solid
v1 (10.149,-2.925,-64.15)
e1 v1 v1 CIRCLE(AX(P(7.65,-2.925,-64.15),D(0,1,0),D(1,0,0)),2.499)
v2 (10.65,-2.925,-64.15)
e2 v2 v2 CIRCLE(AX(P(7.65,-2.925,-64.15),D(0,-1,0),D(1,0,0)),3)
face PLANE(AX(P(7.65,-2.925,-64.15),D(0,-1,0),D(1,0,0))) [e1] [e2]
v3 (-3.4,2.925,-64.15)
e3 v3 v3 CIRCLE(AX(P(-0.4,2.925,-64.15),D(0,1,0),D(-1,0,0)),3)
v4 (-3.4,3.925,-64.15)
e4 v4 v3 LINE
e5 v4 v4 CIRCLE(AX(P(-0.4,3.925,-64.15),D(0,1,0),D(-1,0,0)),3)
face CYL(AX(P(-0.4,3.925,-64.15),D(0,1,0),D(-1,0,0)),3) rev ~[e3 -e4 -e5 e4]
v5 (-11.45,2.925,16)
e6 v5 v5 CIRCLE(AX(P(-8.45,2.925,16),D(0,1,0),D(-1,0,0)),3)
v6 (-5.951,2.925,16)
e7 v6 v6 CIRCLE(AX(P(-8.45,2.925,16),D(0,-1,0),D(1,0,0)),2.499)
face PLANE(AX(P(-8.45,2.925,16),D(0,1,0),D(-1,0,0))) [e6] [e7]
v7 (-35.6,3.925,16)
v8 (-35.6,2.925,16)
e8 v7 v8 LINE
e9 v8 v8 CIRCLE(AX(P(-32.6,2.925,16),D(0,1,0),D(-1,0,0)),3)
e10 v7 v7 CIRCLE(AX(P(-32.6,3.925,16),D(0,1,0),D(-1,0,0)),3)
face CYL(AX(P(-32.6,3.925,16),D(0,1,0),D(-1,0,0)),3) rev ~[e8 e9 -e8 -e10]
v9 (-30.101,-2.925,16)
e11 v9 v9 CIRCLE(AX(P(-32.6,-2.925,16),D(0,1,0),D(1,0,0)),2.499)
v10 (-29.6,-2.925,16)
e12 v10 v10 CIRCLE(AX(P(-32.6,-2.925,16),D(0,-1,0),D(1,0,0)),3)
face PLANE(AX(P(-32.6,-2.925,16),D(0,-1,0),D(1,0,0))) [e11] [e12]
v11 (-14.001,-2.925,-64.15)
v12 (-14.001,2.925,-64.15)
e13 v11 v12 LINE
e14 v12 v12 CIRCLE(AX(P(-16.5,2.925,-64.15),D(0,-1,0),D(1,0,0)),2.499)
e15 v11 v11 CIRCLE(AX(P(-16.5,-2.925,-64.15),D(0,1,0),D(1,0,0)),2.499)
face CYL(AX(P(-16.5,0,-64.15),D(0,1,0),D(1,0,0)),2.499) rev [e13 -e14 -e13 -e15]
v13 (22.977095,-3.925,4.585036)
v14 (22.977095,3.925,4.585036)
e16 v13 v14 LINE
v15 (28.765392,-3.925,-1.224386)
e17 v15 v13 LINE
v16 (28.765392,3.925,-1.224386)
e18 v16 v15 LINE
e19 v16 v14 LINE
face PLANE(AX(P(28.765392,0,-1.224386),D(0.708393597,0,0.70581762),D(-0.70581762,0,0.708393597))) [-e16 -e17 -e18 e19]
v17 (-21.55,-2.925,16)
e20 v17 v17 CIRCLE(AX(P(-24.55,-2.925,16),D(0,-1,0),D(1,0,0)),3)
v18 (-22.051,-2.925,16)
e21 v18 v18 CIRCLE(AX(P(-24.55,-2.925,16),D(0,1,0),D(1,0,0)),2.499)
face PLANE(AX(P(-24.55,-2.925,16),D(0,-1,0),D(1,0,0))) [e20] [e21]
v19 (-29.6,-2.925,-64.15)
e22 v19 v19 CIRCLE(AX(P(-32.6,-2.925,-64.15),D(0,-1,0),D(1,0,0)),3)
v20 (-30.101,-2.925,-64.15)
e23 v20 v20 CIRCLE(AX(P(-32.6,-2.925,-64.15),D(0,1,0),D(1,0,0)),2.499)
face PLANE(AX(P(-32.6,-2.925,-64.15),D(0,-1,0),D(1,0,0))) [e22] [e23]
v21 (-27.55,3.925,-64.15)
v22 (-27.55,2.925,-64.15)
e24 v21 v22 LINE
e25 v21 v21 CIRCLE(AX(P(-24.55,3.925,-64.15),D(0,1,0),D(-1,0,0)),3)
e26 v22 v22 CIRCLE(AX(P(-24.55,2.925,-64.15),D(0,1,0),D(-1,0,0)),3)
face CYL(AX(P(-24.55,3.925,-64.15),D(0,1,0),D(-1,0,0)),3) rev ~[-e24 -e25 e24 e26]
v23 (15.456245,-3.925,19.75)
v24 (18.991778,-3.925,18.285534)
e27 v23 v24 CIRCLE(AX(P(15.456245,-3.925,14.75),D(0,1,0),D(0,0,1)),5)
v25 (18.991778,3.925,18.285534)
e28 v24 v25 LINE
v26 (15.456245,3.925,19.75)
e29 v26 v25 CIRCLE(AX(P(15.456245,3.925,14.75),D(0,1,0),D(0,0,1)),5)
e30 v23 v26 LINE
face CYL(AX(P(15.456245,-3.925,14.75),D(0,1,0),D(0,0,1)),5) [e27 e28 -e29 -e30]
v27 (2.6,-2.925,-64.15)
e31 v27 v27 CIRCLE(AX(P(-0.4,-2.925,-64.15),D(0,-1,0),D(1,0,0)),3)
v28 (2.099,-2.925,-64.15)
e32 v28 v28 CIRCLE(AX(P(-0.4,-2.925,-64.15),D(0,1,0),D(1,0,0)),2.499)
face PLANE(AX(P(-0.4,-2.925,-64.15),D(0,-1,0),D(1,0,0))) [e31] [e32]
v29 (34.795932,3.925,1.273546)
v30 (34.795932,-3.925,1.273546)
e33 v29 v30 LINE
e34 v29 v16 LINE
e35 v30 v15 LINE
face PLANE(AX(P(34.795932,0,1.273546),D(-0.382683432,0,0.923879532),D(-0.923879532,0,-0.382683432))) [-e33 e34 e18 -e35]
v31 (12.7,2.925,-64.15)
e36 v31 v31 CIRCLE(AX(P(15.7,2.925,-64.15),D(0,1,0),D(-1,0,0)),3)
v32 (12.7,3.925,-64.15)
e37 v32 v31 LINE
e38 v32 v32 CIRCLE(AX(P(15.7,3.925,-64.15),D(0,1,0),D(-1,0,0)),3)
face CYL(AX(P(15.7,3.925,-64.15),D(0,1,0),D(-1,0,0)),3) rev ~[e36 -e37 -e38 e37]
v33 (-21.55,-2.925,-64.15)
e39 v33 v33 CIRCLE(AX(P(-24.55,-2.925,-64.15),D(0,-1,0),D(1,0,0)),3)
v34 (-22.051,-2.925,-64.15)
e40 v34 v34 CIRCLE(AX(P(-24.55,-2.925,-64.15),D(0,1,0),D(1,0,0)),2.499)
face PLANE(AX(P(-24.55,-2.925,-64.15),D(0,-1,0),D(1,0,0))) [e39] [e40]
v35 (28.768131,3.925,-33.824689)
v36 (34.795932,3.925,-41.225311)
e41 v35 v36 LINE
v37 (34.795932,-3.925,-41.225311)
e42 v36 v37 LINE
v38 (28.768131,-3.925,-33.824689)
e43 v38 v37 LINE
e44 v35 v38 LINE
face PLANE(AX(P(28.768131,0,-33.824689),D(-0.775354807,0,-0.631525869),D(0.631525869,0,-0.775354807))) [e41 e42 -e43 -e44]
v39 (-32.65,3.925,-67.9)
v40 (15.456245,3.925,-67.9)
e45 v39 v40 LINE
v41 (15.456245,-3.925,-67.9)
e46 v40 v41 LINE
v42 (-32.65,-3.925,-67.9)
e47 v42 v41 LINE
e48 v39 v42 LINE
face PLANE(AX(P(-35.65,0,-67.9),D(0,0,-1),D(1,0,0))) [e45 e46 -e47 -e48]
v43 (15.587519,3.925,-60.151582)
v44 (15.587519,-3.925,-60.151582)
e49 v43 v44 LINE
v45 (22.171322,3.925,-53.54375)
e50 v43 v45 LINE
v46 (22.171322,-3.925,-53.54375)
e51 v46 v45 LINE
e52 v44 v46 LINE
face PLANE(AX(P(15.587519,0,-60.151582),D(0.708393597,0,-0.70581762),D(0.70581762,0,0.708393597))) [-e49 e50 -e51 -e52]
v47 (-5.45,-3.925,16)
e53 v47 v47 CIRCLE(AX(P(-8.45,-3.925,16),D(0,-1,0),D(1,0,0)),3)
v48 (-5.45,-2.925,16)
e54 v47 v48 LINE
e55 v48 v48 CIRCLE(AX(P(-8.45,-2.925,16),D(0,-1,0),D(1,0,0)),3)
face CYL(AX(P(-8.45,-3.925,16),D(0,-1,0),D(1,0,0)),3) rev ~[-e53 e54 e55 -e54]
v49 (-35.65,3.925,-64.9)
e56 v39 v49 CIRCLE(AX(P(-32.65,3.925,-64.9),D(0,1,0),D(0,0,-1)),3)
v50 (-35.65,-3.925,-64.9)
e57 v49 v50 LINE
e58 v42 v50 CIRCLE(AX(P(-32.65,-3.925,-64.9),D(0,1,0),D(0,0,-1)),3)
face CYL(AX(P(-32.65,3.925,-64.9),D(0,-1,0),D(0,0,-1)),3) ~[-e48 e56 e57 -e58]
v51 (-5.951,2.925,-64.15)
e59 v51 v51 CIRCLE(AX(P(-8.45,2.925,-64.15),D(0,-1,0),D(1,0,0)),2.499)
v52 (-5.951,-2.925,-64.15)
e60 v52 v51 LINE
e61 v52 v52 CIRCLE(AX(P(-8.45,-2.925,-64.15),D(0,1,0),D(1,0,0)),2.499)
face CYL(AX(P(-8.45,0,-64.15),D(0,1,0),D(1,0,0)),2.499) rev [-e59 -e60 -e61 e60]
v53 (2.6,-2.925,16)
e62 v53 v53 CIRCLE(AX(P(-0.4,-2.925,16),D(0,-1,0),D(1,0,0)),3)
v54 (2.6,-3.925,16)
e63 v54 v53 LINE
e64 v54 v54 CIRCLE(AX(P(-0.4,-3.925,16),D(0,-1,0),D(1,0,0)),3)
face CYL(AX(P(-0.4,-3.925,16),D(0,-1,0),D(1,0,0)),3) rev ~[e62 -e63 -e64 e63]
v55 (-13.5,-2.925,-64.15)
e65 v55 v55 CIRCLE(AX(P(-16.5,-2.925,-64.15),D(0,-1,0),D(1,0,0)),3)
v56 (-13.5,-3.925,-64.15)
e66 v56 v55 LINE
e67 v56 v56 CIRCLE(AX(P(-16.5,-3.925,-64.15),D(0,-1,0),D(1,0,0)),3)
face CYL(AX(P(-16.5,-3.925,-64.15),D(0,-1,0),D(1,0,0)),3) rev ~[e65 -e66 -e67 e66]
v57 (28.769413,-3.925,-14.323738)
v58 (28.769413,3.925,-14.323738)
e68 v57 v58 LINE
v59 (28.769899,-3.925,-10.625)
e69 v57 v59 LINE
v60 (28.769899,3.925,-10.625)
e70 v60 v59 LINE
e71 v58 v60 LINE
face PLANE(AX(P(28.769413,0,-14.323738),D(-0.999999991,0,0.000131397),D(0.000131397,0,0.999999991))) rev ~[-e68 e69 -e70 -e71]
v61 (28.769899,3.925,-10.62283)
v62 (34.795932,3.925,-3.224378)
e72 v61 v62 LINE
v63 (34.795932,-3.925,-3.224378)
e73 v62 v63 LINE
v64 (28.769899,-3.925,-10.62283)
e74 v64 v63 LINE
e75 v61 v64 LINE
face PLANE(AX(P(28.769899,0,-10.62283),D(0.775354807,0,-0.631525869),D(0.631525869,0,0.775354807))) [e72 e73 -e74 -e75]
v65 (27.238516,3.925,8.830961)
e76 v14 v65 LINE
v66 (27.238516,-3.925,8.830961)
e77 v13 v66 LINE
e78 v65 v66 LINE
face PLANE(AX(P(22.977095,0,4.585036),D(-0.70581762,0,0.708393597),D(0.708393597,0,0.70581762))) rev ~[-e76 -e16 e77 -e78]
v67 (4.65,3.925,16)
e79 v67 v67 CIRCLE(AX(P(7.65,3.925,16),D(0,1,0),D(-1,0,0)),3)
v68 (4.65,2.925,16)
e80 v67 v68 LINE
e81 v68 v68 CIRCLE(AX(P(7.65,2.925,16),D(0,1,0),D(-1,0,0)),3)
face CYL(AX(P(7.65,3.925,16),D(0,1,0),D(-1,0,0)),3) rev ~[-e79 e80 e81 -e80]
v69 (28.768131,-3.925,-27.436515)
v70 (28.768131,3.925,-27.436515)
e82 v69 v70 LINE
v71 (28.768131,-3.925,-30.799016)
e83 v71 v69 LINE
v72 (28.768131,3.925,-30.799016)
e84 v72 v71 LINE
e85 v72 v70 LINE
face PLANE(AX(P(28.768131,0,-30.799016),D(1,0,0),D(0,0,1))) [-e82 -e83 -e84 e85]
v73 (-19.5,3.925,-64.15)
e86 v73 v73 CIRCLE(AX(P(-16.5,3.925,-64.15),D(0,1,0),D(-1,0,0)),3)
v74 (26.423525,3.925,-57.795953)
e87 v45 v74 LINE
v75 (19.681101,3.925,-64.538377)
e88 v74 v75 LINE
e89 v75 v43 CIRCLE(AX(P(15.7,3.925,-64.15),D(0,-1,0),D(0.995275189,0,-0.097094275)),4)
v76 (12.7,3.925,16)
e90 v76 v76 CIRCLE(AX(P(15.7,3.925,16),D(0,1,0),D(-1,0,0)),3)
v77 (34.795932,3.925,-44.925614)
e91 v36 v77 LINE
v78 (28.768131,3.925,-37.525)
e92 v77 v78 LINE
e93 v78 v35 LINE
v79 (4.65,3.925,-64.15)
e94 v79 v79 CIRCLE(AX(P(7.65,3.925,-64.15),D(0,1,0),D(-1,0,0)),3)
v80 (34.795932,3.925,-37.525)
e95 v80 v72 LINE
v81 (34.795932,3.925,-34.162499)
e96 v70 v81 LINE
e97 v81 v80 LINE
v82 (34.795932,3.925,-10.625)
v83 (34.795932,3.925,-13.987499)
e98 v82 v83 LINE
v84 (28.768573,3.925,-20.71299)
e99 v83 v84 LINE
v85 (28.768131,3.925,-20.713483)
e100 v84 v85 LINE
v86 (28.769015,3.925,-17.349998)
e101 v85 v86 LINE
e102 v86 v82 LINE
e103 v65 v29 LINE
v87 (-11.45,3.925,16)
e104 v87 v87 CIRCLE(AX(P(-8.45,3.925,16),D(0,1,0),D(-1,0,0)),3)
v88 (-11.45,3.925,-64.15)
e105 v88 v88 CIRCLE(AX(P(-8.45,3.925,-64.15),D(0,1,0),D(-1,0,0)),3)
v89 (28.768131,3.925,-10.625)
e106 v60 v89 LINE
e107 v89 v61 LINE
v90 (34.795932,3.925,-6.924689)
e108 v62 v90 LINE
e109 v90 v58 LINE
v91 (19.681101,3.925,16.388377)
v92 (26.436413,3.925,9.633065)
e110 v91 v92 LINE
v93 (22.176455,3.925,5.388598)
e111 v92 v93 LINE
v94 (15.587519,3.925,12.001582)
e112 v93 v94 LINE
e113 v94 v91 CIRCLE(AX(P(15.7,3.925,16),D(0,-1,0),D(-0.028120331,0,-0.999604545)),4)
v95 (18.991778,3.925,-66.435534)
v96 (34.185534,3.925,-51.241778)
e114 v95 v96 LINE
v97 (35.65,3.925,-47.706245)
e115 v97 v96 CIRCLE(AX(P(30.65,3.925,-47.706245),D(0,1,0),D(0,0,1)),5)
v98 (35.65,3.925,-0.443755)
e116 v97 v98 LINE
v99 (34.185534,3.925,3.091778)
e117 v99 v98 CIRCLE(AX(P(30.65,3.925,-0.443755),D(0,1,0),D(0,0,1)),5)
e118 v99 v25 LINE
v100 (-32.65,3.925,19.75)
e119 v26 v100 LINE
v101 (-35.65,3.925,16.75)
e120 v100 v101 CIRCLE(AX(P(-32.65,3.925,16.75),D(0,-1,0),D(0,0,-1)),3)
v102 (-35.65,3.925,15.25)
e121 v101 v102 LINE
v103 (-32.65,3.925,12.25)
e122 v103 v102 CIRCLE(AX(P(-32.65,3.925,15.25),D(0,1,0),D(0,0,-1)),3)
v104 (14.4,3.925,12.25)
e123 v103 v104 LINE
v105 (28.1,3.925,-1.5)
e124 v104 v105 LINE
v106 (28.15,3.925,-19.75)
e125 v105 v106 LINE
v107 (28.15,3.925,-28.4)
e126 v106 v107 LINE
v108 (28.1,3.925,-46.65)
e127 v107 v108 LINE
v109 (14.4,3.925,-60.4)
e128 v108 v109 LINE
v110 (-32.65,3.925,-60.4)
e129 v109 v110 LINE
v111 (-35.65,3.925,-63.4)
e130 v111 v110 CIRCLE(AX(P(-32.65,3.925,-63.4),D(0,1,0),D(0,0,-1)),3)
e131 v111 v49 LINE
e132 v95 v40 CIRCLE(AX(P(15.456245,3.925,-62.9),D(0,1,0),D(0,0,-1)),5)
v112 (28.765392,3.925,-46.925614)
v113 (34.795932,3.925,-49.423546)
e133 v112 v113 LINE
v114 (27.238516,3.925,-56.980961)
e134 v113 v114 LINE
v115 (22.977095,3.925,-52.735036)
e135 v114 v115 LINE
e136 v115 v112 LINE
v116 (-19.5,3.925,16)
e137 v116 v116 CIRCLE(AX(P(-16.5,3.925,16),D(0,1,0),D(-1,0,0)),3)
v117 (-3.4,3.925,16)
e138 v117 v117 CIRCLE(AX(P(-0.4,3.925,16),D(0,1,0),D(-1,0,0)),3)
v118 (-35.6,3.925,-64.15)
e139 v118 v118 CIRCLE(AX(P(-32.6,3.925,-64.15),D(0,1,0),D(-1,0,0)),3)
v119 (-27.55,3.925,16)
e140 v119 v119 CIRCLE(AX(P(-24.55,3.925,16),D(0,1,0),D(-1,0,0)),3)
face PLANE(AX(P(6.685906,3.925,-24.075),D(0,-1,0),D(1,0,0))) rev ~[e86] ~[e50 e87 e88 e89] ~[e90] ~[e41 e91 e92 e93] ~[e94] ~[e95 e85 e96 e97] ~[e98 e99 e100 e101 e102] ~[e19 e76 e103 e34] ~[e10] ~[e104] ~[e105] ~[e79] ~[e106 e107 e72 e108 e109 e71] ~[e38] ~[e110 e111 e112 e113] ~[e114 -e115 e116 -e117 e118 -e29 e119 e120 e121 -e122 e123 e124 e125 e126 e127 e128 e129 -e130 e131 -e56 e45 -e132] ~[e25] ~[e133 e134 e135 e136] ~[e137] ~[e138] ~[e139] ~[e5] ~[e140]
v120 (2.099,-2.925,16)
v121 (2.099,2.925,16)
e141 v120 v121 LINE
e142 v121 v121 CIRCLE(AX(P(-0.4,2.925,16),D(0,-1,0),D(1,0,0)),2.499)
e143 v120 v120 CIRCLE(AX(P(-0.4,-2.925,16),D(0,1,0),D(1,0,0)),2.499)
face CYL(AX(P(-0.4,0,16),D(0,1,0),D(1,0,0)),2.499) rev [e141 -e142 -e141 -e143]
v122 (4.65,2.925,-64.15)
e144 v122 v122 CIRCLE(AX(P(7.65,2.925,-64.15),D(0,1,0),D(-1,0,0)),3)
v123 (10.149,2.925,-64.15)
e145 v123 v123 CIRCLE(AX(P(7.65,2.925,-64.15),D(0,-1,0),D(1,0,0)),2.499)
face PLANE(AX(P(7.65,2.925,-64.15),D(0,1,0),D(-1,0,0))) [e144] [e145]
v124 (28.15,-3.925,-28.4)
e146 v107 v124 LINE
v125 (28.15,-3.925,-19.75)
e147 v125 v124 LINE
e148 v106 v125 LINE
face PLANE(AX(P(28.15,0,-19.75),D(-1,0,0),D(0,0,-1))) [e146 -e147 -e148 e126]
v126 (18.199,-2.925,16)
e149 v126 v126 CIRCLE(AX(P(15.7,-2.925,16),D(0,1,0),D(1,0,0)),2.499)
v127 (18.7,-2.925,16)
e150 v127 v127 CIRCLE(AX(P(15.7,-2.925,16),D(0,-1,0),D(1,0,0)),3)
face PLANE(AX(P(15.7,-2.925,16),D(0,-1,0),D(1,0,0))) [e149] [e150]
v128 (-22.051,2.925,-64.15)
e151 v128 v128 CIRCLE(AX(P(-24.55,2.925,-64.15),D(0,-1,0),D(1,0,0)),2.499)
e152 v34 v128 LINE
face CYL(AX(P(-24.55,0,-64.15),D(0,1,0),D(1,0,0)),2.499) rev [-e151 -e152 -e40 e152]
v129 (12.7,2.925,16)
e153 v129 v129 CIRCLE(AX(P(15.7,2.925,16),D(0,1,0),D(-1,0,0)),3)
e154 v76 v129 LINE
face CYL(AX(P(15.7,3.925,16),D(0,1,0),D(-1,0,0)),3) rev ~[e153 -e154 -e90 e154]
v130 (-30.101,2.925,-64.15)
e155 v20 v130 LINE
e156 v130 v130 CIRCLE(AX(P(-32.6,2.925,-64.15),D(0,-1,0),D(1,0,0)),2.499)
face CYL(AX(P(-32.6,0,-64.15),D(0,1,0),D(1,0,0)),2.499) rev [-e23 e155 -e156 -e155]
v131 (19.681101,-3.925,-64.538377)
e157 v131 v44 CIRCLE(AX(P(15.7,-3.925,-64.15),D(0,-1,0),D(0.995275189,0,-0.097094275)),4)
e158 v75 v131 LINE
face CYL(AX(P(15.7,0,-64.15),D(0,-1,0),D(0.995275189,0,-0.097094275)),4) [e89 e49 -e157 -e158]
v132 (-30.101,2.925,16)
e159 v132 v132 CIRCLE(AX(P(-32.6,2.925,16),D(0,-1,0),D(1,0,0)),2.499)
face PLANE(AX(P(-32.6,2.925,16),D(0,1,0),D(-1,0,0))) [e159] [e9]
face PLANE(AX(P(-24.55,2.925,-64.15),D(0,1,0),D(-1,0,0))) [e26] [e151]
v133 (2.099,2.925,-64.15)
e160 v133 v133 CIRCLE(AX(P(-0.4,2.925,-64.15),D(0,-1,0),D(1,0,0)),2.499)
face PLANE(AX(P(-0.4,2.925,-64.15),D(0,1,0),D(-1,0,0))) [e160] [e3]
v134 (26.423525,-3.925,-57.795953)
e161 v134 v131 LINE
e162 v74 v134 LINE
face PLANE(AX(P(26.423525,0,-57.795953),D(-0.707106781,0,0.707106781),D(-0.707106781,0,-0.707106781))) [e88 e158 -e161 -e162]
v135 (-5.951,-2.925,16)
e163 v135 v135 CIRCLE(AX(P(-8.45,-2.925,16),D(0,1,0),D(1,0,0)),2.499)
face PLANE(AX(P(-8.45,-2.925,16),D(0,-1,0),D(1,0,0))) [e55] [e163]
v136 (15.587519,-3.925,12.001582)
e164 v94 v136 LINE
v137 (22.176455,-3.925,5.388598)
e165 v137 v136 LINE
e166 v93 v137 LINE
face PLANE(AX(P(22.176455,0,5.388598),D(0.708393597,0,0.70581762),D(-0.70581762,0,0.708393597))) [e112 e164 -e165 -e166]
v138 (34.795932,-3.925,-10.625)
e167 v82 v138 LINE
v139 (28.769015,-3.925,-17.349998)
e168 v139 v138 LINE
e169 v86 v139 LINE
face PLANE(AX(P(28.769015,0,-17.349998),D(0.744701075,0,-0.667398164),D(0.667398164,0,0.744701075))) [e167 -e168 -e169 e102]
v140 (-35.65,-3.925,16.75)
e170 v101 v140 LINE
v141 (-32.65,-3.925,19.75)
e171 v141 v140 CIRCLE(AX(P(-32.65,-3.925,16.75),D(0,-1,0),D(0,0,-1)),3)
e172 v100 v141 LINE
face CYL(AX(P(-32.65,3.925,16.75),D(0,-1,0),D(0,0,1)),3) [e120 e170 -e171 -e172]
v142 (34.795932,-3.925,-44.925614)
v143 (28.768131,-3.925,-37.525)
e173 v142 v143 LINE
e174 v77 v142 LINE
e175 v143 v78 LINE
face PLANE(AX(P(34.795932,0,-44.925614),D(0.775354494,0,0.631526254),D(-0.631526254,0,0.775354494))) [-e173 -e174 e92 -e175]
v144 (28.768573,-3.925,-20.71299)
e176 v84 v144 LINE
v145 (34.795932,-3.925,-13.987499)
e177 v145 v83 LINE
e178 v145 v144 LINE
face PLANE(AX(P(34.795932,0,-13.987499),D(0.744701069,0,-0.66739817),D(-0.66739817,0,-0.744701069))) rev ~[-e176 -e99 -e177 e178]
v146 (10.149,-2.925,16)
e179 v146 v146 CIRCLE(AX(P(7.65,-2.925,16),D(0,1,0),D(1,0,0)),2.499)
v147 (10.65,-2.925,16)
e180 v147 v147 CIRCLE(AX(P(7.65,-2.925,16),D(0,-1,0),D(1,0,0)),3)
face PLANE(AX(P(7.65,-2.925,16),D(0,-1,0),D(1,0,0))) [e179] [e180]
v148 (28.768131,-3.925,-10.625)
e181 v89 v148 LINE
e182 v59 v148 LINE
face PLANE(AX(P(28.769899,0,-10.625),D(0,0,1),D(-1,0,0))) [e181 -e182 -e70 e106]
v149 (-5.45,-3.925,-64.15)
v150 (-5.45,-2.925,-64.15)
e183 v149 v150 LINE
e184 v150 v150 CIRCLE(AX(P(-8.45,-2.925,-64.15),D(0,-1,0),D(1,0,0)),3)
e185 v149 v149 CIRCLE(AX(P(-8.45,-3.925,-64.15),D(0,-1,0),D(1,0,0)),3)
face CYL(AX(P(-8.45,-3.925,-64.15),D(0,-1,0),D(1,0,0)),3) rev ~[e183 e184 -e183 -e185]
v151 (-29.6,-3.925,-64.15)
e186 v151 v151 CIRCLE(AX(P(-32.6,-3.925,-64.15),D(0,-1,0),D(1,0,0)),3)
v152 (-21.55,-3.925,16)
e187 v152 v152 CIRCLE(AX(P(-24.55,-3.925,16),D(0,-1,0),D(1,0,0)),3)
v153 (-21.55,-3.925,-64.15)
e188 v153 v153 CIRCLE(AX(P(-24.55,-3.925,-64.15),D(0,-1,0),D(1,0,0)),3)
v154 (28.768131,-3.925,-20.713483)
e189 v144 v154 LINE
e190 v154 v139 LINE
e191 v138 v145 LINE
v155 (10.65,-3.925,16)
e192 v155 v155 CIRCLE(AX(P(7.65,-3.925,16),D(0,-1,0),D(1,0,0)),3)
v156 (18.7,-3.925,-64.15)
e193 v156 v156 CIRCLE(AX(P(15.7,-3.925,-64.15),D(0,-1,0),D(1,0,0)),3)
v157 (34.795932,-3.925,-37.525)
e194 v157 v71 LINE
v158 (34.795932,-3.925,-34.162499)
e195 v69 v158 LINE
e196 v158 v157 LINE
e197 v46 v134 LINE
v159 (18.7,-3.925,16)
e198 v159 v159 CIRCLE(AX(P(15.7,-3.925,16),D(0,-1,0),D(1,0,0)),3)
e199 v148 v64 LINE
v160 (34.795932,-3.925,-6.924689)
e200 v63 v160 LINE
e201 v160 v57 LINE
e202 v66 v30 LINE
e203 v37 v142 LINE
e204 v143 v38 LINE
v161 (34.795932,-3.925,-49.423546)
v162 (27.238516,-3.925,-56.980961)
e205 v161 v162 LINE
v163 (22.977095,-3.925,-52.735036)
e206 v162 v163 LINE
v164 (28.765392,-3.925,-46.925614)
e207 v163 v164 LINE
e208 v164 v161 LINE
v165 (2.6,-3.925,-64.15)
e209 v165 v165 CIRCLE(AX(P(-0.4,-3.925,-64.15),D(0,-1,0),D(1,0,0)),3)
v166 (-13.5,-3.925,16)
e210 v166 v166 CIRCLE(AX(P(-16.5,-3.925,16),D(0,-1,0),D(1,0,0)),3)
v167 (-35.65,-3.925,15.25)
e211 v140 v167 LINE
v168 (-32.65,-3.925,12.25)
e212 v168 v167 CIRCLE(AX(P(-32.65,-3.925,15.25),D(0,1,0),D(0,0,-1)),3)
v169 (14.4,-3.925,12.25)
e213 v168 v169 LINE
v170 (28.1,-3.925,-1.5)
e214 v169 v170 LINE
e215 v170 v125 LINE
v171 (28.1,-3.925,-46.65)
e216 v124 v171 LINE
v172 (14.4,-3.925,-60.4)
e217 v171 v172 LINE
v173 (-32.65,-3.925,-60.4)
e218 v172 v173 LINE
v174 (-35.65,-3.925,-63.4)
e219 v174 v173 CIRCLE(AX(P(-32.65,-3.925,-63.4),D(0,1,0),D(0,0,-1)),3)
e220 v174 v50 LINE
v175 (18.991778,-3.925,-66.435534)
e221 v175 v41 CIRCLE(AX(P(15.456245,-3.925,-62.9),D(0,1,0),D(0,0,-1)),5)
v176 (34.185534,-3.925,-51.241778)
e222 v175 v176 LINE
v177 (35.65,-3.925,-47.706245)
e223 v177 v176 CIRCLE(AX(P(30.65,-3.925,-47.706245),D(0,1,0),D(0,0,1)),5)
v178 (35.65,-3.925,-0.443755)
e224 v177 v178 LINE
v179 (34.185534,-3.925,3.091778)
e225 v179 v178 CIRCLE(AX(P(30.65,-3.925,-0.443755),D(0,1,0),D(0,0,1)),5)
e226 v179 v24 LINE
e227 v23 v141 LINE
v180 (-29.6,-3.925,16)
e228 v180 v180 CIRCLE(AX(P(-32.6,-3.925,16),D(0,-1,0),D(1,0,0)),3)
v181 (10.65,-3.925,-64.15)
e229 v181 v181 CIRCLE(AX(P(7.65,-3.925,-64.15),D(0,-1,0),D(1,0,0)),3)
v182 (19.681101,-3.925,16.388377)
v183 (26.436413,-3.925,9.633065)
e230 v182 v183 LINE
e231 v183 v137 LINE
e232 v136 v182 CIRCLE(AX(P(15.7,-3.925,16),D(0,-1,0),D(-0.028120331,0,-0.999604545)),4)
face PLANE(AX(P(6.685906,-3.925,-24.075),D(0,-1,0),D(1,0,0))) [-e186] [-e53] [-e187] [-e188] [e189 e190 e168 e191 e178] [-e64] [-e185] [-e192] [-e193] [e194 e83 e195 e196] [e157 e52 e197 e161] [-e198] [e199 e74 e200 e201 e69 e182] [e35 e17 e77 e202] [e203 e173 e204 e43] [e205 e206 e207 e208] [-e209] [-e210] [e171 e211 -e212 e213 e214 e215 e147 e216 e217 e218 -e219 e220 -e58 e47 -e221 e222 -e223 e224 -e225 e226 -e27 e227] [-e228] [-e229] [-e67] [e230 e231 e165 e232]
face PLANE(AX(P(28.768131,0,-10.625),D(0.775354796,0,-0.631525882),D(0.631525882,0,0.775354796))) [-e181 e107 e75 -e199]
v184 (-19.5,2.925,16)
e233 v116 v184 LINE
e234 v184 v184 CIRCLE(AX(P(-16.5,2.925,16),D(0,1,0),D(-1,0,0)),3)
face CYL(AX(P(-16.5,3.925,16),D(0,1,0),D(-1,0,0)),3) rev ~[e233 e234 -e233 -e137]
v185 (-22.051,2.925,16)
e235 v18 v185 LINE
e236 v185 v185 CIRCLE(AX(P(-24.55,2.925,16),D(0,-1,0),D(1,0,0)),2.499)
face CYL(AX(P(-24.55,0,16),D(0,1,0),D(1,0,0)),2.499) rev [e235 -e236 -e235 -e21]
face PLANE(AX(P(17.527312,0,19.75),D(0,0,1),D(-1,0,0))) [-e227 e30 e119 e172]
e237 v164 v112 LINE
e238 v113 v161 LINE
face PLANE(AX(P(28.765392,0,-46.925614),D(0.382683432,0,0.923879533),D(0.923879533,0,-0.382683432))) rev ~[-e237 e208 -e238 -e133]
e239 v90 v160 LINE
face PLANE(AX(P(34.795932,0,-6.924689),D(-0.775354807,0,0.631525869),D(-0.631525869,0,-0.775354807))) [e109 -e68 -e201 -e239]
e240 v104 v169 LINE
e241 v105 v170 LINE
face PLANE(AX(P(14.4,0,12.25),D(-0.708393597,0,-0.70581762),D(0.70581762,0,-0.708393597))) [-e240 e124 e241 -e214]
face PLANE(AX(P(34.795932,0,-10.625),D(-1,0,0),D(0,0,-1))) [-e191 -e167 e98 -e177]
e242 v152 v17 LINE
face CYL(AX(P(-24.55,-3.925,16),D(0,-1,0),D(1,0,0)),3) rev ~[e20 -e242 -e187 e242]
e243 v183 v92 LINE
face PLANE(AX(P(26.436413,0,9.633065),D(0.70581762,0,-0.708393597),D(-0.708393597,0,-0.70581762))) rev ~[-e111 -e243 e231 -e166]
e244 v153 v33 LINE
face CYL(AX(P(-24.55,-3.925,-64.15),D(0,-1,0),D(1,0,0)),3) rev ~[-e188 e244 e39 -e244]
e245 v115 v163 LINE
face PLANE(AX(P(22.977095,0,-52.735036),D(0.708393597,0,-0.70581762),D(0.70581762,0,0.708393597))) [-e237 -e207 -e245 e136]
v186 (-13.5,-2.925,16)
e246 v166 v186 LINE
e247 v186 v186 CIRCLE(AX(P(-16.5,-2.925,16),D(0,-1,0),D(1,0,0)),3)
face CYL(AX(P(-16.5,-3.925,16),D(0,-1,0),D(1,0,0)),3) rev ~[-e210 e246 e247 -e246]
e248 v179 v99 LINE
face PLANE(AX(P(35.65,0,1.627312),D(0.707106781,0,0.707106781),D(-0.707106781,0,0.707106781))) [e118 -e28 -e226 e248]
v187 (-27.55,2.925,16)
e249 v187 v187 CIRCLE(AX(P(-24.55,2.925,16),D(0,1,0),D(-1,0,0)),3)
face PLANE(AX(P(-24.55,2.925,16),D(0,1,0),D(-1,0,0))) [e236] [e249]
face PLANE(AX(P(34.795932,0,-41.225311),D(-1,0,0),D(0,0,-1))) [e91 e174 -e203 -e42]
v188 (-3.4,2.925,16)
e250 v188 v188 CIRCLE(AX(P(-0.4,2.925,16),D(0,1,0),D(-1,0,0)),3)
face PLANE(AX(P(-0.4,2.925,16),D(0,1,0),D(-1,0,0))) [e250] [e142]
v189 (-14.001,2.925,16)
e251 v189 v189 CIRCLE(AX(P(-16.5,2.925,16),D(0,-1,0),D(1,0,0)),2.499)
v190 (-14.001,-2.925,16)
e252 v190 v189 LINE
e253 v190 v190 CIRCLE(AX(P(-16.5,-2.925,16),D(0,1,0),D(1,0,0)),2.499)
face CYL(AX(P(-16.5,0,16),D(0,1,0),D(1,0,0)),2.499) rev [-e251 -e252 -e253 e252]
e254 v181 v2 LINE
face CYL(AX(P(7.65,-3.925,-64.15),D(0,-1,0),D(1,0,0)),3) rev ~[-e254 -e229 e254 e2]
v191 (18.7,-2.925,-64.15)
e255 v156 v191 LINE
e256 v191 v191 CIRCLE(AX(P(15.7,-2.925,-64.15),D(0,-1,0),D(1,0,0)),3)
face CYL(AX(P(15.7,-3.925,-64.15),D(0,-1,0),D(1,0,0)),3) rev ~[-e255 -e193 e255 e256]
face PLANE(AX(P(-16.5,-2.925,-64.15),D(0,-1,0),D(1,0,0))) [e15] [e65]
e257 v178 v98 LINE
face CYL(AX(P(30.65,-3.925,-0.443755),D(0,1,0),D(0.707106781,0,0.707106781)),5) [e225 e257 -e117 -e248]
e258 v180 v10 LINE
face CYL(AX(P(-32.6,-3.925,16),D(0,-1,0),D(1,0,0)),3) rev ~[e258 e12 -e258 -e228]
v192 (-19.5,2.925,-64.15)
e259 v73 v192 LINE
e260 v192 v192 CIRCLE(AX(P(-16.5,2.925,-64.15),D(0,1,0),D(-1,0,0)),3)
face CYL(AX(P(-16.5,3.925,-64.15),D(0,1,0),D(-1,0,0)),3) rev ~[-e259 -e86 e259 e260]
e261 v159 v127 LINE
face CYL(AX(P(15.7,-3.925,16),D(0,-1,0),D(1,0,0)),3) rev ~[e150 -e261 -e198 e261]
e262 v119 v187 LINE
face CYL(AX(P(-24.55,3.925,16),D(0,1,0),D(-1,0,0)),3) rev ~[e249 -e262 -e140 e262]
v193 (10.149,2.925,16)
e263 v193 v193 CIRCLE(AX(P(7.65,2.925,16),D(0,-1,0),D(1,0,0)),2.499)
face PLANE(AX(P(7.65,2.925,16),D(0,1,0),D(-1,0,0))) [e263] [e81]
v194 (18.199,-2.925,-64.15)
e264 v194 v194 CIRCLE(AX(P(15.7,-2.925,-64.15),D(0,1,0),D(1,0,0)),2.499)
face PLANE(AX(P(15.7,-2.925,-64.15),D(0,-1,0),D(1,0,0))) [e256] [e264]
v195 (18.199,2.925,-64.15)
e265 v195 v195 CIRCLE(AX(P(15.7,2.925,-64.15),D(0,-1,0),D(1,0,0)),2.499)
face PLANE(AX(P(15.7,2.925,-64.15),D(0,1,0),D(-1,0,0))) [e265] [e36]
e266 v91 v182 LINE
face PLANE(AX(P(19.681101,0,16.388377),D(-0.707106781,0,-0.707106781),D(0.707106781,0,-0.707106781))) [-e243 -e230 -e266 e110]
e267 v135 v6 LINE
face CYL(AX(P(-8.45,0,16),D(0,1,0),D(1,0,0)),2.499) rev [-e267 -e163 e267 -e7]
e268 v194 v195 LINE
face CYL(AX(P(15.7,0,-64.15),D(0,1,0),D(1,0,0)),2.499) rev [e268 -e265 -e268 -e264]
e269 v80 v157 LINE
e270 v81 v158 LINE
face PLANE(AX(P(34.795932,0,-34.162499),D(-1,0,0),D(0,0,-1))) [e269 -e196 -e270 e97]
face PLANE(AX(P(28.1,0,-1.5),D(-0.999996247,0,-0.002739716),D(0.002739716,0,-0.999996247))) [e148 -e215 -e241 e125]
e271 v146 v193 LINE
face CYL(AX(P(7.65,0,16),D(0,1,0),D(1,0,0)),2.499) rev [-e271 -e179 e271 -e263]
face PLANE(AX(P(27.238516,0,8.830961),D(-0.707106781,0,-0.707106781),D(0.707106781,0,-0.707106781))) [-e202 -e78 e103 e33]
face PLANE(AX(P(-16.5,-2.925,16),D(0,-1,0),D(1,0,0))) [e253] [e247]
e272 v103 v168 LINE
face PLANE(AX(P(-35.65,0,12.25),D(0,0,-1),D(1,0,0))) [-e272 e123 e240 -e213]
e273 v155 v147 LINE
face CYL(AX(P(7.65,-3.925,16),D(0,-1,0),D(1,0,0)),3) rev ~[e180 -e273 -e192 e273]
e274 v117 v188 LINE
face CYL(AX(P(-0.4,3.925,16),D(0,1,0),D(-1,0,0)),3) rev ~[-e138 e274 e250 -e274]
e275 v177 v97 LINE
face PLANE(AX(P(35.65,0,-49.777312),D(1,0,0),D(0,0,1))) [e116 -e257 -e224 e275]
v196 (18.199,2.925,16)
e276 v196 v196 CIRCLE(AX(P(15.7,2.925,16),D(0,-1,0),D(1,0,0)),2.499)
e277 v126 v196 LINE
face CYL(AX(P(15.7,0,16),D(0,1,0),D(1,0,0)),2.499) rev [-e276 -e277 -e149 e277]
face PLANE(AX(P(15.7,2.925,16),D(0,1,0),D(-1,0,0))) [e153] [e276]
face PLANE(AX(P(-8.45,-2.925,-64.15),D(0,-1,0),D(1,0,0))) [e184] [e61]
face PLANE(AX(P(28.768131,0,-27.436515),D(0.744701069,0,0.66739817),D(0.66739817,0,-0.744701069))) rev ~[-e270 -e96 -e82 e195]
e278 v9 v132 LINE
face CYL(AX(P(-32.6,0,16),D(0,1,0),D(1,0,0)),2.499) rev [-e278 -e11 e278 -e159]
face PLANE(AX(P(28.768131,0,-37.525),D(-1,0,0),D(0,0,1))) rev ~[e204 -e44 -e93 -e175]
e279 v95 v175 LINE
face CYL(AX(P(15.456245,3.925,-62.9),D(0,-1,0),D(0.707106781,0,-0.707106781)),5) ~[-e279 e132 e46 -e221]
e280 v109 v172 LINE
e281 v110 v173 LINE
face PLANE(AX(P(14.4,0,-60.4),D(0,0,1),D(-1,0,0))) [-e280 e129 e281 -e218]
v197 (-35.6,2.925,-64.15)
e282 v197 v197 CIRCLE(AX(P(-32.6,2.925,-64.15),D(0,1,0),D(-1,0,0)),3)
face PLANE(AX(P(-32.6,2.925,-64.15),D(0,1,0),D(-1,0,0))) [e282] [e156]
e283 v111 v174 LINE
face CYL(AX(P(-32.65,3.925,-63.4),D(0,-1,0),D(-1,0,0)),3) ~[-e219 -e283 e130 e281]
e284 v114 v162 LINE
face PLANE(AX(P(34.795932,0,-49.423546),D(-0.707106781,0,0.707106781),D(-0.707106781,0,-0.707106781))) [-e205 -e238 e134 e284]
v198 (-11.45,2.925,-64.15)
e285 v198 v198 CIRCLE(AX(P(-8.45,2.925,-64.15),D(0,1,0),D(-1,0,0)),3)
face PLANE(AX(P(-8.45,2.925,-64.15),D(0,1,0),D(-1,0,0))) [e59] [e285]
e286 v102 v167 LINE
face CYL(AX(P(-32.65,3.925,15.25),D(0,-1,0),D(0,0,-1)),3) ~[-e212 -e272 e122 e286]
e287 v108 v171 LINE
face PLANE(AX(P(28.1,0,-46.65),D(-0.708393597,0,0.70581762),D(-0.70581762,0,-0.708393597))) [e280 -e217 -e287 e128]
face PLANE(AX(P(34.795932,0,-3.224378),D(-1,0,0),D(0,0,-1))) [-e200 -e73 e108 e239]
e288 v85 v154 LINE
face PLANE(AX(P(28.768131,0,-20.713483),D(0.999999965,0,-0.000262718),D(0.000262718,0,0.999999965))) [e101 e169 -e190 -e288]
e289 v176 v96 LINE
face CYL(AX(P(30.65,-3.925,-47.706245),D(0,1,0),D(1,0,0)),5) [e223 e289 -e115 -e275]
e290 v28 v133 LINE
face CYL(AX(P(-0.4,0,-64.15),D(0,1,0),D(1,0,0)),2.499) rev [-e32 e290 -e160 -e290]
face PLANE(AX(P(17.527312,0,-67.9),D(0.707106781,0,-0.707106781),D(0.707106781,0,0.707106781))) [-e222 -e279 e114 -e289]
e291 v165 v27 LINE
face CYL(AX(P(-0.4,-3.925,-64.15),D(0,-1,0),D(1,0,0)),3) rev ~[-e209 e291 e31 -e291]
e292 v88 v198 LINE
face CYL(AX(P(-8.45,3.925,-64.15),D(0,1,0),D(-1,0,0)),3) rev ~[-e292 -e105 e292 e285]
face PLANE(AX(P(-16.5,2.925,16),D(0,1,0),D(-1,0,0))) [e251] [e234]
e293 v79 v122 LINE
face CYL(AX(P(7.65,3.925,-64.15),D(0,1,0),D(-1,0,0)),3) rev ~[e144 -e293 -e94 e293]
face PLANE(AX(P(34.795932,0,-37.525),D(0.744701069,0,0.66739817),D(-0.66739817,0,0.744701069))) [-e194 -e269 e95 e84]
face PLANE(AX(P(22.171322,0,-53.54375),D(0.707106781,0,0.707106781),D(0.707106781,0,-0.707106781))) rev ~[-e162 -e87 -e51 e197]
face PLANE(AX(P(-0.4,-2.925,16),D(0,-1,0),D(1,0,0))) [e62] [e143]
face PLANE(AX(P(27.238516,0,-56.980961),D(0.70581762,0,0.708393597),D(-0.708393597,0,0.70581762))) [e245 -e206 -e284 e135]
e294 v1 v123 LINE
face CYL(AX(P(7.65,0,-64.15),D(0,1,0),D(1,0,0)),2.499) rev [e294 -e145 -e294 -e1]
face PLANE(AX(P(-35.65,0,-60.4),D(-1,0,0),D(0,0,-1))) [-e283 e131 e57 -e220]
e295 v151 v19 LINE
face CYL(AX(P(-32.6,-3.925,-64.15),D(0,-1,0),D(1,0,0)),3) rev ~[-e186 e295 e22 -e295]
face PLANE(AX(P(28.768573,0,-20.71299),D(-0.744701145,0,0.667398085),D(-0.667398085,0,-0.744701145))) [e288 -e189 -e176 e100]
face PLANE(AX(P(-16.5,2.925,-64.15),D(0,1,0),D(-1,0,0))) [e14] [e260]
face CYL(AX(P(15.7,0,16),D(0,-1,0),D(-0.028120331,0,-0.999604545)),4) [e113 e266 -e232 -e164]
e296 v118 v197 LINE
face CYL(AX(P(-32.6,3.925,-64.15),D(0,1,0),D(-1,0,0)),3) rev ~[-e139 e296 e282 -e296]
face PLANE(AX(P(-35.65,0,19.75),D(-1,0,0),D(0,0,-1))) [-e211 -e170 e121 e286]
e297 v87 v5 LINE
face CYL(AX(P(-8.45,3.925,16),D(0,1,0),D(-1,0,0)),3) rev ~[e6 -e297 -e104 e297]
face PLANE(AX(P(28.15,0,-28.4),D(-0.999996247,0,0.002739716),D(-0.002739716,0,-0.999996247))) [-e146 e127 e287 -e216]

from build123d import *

# Parameters (mm, degrees)
F0_R     = 3
F0_R_2   = 2.499
F1_DEPTH = 3.925
F2_R     = 3
F3_R     = 5
F4_R     = 3
F5_DEPTH = 1
F6_R     = 3
F6_R_2   = 2.499
F7_DEPTH = 1


# Not quite as in the source:
# - ends of sketch curves that miss each other by under 0.0002 mm in the source are joined


with BuildPart() as f1:
    # F0 (on Front) → F1 (new body, symmetric)
    with BuildSketch(Plane.XZ):
        Polygon((18.9613047033, 18.3160076926), (17.5273123959, 19.75), (-35.65, 19.75), (-35.65, 12.25), (14.4, 12.25), (28.1, -1.5000000006), (28.15, -19.7499999994), (28.15, -28.3999999994), (28.1, -46.65), (14.4, -60.4), (-35.65, -60.4), (-35.65, -67.9), (17.5273123959, -67.9), (18.9613047033, -66.4660076926), (35.65, -49.7773123959), (35.65, -28.4), (35.65, -19.75), (35.65, 1.6273123959), align=None)
        with Locations((-32.6, -64.15)):
            Circle(F0_R, mode=Mode.SUBTRACT)
        with Locations((-24.55, -64.15)):
            Circle(F0_R, mode=Mode.SUBTRACT)
        with Locations((-16.5, -64.15)):
            Circle(F0_R, mode=Mode.SUBTRACT)
        with Locations((-8.45, -64.15)):
            Circle(F0_R, mode=Mode.SUBTRACT)
        with Locations((-0.4, -64.15)):
            Circle(F0_R, mode=Mode.SUBTRACT)
        with Locations((7.65, -64.15)):
            Circle(F0_R, mode=Mode.SUBTRACT)
        with Locations((15.7, -64.15)):
            Circle(F0_R, mode=Mode.SUBTRACT)
        with BuildLine():
            ThreePointArc((19.6811007558, -64.5383771008), (18.6244738475, -61.4209978536), (15.5875186741, -60.1515818189))
            Line((15.5875186741, -60.1515818189), (22.1713217449, -53.5437502697))
            Line((22.1713217449, -53.5437502697), (22.9770950322, -52.735036204))
            Line((22.9770950322, -52.735036204), (28.7653917701, -46.9256142955))
            Line((28.7653917701, -46.9256142955), (34.7959320067, -49.4235458499))
            Line((34.7959320067, -49.4235458499), (27.2385163812, -56.9809614754))
            Line((27.2385163812, -56.9809614754), (26.4235246659, -57.7959531907))
            Line((26.4235246659, -57.7959531907), (19.6811007558, -64.5383771008))
        make_face(mode=Mode.SUBTRACT)
        Polygon((34.7959320067, -41.2253109008), (34.7959320067, -44.9256142955), (28.7681314859, -37.525), (28.7681314859, -33.8246890992), align=None, mode=Mode.SUBTRACT)
        Polygon((34.7959320067, -37.525), (28.7681314859, -30.7990158793), (28.7681314859, -27.436514941), (34.7959320067, -34.1624990617), align=None, mode=Mode.SUBTRACT)
        with Locations((-32.6, 16)):
            Circle(F0_R, mode=Mode.SUBTRACT)
        with Locations((-24.55, 16)):
            Circle(F0_R, mode=Mode.SUBTRACT)
        with Locations((-16.5, 16)):
            Circle(F0_R, mode=Mode.SUBTRACT)
        with Locations((-8.45, 16)):
            Circle(F0_R, mode=Mode.SUBTRACT)
        with Locations((-0.4, 16)):
            Circle(F0_R, mode=Mode.SUBTRACT)
        Polygon((28.7681314859, -20.7134831825), (28.7690151327, -17.3499982396), (34.7959320067, -10.625), (34.7959320067, -13.9874990617), (28.7685732445, -20.7129902561), align=None, mode=Mode.SUBTRACT)
        Polygon((28.7681314859, -10.625), (28.7698990648, -10.6228298581), (34.7959320067, -3.2243781985), (34.7959320067, -6.9246890992), (28.7694127753, -14.3237377999), (28.7698987796, -10.625), align=None, mode=Mode.SUBTRACT)
        with Locations((7.65, 16)):
            Circle(F0_R, mode=Mode.SUBTRACT)
        with Locations((15.7, 16)):
            Circle(F0_R, mode=Mode.SUBTRACT)
        with BuildLine():
            Line((22.176455222, 5.388598057), (15.5875186741, 12.0015818188))
            ThreePointArc((15.5875186741, 12.0015818188), (18.6244738475, 13.2709978536), (19.6811007558, 16.3883771008))
            Line((19.6811007558, 16.3883771008), (26.4364128886, 9.6330649683))
            Line((26.4364128886, 9.6330649683), (27.2385163814, 8.8309614755))
            Line((27.2385163814, 8.8309614755), (34.795932007, 1.2735458502))
            Line((34.795932007, 1.2735458502), (28.7653917699, -1.2243857048))
            Line((28.7653917699, -1.2243857048), (22.977095032, 4.5850362039))
            Line((22.977095032, 4.5850362039), (22.176455222, 5.388598057))
        make_face(mode=Mode.SUBTRACT)
        with Locations((-32.6, 16)):
            Circle(F0_R)
        with Locations((-32.6, 16)):
            Circle(F0_R_2, mode=Mode.SUBTRACT)
        with Locations((-24.55, 16)):
            Circle(F0_R)
        with Locations((-24.55, 16)):
            Circle(F0_R_2, mode=Mode.SUBTRACT)
        with Locations((-16.5, 16)):
            Circle(F0_R)
        with Locations((-16.5, 16)):
            Circle(F0_R_2, mode=Mode.SUBTRACT)
        with Locations((-0.4, 16)):
            Circle(F0_R)
        with Locations((-0.4, 16)):
            Circle(F0_R_2, mode=Mode.SUBTRACT)
        with Locations((7.65, 16)):
            Circle(F0_R)
        with Locations((7.65, 16)):
            Circle(F0_R_2, mode=Mode.SUBTRACT)
        with Locations((-8.45, 16)):
            Circle(F0_R)
        with Locations((-8.45, 16)):
            Circle(F0_R_2, mode=Mode.SUBTRACT)
        with Locations((15.7, 16)):
            Circle(F0_R)
        with Locations((15.7, 16)):
            Circle(F0_R_2, mode=Mode.SUBTRACT)
        with Locations((7.65, -64.15)):
            Circle(F0_R)
        with Locations((7.65, -64.15)):
            Circle(F0_R_2, mode=Mode.SUBTRACT)
        with Locations((15.7, -64.15)):
            Circle(F0_R)
        with Locations((15.7, -64.15)):
            Circle(F0_R_2, mode=Mode.SUBTRACT)
        with Locations((-0.4, -64.15)):
            Circle(F0_R)
        with Locations((-0.4, -64.15)):
            Circle(F0_R_2, mode=Mode.SUBTRACT)
        with Locations((-8.45, -64.15)):
            Circle(F0_R)
        with Locations((-8.45, -64.15)):
            Circle(F0_R_2, mode=Mode.SUBTRACT)
        with Locations((-16.5, -64.15)):
            Circle(F0_R)
        with Locations((-16.5, -64.15)):
            Circle(F0_R_2, mode=Mode.SUBTRACT)
        with Locations((-24.55, -64.15)):
            Circle(F0_R)
        with Locations((-24.55, -64.15)):
            Circle(F0_R_2, mode=Mode.SUBTRACT)
        with Locations((-32.6, -64.15)):
            Circle(F0_R)
        with Locations((-32.6, -64.15)):
            Circle(F0_R_2, mode=Mode.SUBTRACT)
        Polygon((22.9770950322, -52.735036204), (22.1713217449, -53.5437502697), (26.4235246659, -57.7959531907), (27.2385163812, -56.9809614754), align=None)
        Polygon((26.4364128886, 9.6330649683), (22.176455222, 5.388598057), (22.977095032, 4.5850362039), (27.2385163814, 8.8309614755), align=None)
    extrude(amount=F1_DEPTH, both=True)

    # F2
    f2_edges = [f1.edges().sort_by_distance(p)[0] for p in [
        (-35.65, 0, 19.75),
        (-35.65, 0, 12.25),
        (-35.65, 0, -60.4),
        (-35.65, 0, -67.9),
    ]]
    fillet(f2_edges, radius=F2_R)

    # F3
    f3_edges = [f1.edges().sort_by_distance(p)[0] for p in [
        (35.65, 0, 1.627312),
        (17.527312, 0, 19.75),
        (35.65, 0, -49.777312),
        (17.527312, 0, -67.9),
    ]]
    fillet(f3_edges, radius=F3_R)

    # F4 (on face) → F5 (cut)
    with BuildSketch(Plane.XZ.offset(3.925)):
        with Locations((-24.55, 16)):
            Circle(F4_R)
        with Locations((-16.5, 16)):
            Circle(F4_R)
        with Locations((-8.45, 16)):
            Circle(F4_R)
        with Locations((-0.4, 16)):
            Circle(F4_R)
        with Locations((7.65, 16)):
            Circle(F4_R)
        with Locations((15.7, 16)):
            Circle(F4_R)
        with Locations((-32.6, 16)):
            Circle(F4_R)
        with Locations((-32.6, -64.15)):
            Circle(F4_R)
        with Locations((-24.55, -64.15)):
            Circle(F4_R)
        with Locations((-16.5, -64.15)):
            Circle(F4_R)
        with Locations((-8.45, -64.15)):
            Circle(F4_R)
        with Locations((-0.4, -64.15)):
            Circle(F4_R)
        with Locations((7.65, -64.15)):
            Circle(F4_R)
        with Locations((15.7, -64.15)):
            Circle(F4_R)
    extrude(amount=-F5_DEPTH, mode=Mode.SUBTRACT)

    # F6 (on face) → F7 (cut)
    with BuildSketch(Plane(origin=(0, 3.925, 0), x_dir=(-1, 0, 0), z_dir=(0, 1, 0))):
        with Locations((-15.7, 16)):
            Circle(F6_R)
        with Locations((-15.7, 16)):
            Circle(F6_R_2, mode=Mode.SUBTRACT)
        with Locations((-7.65, 16)):
            Circle(F6_R)
        with Locations((-7.65, 16)):
            Circle(F6_R_2, mode=Mode.SUBTRACT)
        with Locations((0.4, 16)):
            Circle(F6_R)
        with Locations((0.4, 16)):
            Circle(F6_R_2, mode=Mode.SUBTRACT)
        with Locations((8.45, 16)):
            Circle(F6_R)
        with Locations((8.45, 16)):
            Circle(F6_R_2, mode=Mode.SUBTRACT)
        with Locations((16.5, 16)):
            Circle(F6_R)
        with Locations((16.5, 16)):
            Circle(F6_R_2, mode=Mode.SUBTRACT)
        with Locations((24.55, 16)):
            Circle(F6_R)
        with Locations((24.55, 16)):
            Circle(F6_R_2, mode=Mode.SUBTRACT)
        with Locations((32.6, 16)):
            Circle(F6_R)
        with Locations((32.6, 16)):
            Circle(F6_R_2, mode=Mode.SUBTRACT)
        with Locations((-15.7, -64.15)):
            Circle(F6_R)
        with Locations((-15.7, -64.15)):
            Circle(F6_R_2, mode=Mode.SUBTRACT)
        with Locations((-7.65, -64.15)):
            Circle(F6_R)
        with Locations((-7.65, -64.15)):
            Circle(F6_R_2, mode=Mode.SUBTRACT)
        with Locations((0.4, -64.15)):
            Circle(F6_R)
        with Locations((0.4, -64.15)):
            Circle(F6_R_2, mode=Mode.SUBTRACT)
        with Locations((8.45, -64.15)):
            Circle(F6_R)
        with Locations((8.45, -64.15)):
            Circle(F6_R_2, mode=Mode.SUBTRACT)
        with Locations((16.5, -64.15)):
            Circle(F6_R)
        with Locations((16.5, -64.15)):
            Circle(F6_R_2, mode=Mode.SUBTRACT)
        with Locations((24.55, -64.15)):
            Circle(F6_R)
        with Locations((24.55, -64.15)):
            Circle(F6_R_2, mode=Mode.SUBTRACT)
        with Locations((32.6, -64.15)):
            Circle(F6_R)
        with Locations((32.6, -64.15)):
            Circle(F6_R_2, mode=Mode.SUBTRACT)
    extrude(amount=-F7_DEPTH, mode=Mode.SUBTRACT)


solid = f1.part
